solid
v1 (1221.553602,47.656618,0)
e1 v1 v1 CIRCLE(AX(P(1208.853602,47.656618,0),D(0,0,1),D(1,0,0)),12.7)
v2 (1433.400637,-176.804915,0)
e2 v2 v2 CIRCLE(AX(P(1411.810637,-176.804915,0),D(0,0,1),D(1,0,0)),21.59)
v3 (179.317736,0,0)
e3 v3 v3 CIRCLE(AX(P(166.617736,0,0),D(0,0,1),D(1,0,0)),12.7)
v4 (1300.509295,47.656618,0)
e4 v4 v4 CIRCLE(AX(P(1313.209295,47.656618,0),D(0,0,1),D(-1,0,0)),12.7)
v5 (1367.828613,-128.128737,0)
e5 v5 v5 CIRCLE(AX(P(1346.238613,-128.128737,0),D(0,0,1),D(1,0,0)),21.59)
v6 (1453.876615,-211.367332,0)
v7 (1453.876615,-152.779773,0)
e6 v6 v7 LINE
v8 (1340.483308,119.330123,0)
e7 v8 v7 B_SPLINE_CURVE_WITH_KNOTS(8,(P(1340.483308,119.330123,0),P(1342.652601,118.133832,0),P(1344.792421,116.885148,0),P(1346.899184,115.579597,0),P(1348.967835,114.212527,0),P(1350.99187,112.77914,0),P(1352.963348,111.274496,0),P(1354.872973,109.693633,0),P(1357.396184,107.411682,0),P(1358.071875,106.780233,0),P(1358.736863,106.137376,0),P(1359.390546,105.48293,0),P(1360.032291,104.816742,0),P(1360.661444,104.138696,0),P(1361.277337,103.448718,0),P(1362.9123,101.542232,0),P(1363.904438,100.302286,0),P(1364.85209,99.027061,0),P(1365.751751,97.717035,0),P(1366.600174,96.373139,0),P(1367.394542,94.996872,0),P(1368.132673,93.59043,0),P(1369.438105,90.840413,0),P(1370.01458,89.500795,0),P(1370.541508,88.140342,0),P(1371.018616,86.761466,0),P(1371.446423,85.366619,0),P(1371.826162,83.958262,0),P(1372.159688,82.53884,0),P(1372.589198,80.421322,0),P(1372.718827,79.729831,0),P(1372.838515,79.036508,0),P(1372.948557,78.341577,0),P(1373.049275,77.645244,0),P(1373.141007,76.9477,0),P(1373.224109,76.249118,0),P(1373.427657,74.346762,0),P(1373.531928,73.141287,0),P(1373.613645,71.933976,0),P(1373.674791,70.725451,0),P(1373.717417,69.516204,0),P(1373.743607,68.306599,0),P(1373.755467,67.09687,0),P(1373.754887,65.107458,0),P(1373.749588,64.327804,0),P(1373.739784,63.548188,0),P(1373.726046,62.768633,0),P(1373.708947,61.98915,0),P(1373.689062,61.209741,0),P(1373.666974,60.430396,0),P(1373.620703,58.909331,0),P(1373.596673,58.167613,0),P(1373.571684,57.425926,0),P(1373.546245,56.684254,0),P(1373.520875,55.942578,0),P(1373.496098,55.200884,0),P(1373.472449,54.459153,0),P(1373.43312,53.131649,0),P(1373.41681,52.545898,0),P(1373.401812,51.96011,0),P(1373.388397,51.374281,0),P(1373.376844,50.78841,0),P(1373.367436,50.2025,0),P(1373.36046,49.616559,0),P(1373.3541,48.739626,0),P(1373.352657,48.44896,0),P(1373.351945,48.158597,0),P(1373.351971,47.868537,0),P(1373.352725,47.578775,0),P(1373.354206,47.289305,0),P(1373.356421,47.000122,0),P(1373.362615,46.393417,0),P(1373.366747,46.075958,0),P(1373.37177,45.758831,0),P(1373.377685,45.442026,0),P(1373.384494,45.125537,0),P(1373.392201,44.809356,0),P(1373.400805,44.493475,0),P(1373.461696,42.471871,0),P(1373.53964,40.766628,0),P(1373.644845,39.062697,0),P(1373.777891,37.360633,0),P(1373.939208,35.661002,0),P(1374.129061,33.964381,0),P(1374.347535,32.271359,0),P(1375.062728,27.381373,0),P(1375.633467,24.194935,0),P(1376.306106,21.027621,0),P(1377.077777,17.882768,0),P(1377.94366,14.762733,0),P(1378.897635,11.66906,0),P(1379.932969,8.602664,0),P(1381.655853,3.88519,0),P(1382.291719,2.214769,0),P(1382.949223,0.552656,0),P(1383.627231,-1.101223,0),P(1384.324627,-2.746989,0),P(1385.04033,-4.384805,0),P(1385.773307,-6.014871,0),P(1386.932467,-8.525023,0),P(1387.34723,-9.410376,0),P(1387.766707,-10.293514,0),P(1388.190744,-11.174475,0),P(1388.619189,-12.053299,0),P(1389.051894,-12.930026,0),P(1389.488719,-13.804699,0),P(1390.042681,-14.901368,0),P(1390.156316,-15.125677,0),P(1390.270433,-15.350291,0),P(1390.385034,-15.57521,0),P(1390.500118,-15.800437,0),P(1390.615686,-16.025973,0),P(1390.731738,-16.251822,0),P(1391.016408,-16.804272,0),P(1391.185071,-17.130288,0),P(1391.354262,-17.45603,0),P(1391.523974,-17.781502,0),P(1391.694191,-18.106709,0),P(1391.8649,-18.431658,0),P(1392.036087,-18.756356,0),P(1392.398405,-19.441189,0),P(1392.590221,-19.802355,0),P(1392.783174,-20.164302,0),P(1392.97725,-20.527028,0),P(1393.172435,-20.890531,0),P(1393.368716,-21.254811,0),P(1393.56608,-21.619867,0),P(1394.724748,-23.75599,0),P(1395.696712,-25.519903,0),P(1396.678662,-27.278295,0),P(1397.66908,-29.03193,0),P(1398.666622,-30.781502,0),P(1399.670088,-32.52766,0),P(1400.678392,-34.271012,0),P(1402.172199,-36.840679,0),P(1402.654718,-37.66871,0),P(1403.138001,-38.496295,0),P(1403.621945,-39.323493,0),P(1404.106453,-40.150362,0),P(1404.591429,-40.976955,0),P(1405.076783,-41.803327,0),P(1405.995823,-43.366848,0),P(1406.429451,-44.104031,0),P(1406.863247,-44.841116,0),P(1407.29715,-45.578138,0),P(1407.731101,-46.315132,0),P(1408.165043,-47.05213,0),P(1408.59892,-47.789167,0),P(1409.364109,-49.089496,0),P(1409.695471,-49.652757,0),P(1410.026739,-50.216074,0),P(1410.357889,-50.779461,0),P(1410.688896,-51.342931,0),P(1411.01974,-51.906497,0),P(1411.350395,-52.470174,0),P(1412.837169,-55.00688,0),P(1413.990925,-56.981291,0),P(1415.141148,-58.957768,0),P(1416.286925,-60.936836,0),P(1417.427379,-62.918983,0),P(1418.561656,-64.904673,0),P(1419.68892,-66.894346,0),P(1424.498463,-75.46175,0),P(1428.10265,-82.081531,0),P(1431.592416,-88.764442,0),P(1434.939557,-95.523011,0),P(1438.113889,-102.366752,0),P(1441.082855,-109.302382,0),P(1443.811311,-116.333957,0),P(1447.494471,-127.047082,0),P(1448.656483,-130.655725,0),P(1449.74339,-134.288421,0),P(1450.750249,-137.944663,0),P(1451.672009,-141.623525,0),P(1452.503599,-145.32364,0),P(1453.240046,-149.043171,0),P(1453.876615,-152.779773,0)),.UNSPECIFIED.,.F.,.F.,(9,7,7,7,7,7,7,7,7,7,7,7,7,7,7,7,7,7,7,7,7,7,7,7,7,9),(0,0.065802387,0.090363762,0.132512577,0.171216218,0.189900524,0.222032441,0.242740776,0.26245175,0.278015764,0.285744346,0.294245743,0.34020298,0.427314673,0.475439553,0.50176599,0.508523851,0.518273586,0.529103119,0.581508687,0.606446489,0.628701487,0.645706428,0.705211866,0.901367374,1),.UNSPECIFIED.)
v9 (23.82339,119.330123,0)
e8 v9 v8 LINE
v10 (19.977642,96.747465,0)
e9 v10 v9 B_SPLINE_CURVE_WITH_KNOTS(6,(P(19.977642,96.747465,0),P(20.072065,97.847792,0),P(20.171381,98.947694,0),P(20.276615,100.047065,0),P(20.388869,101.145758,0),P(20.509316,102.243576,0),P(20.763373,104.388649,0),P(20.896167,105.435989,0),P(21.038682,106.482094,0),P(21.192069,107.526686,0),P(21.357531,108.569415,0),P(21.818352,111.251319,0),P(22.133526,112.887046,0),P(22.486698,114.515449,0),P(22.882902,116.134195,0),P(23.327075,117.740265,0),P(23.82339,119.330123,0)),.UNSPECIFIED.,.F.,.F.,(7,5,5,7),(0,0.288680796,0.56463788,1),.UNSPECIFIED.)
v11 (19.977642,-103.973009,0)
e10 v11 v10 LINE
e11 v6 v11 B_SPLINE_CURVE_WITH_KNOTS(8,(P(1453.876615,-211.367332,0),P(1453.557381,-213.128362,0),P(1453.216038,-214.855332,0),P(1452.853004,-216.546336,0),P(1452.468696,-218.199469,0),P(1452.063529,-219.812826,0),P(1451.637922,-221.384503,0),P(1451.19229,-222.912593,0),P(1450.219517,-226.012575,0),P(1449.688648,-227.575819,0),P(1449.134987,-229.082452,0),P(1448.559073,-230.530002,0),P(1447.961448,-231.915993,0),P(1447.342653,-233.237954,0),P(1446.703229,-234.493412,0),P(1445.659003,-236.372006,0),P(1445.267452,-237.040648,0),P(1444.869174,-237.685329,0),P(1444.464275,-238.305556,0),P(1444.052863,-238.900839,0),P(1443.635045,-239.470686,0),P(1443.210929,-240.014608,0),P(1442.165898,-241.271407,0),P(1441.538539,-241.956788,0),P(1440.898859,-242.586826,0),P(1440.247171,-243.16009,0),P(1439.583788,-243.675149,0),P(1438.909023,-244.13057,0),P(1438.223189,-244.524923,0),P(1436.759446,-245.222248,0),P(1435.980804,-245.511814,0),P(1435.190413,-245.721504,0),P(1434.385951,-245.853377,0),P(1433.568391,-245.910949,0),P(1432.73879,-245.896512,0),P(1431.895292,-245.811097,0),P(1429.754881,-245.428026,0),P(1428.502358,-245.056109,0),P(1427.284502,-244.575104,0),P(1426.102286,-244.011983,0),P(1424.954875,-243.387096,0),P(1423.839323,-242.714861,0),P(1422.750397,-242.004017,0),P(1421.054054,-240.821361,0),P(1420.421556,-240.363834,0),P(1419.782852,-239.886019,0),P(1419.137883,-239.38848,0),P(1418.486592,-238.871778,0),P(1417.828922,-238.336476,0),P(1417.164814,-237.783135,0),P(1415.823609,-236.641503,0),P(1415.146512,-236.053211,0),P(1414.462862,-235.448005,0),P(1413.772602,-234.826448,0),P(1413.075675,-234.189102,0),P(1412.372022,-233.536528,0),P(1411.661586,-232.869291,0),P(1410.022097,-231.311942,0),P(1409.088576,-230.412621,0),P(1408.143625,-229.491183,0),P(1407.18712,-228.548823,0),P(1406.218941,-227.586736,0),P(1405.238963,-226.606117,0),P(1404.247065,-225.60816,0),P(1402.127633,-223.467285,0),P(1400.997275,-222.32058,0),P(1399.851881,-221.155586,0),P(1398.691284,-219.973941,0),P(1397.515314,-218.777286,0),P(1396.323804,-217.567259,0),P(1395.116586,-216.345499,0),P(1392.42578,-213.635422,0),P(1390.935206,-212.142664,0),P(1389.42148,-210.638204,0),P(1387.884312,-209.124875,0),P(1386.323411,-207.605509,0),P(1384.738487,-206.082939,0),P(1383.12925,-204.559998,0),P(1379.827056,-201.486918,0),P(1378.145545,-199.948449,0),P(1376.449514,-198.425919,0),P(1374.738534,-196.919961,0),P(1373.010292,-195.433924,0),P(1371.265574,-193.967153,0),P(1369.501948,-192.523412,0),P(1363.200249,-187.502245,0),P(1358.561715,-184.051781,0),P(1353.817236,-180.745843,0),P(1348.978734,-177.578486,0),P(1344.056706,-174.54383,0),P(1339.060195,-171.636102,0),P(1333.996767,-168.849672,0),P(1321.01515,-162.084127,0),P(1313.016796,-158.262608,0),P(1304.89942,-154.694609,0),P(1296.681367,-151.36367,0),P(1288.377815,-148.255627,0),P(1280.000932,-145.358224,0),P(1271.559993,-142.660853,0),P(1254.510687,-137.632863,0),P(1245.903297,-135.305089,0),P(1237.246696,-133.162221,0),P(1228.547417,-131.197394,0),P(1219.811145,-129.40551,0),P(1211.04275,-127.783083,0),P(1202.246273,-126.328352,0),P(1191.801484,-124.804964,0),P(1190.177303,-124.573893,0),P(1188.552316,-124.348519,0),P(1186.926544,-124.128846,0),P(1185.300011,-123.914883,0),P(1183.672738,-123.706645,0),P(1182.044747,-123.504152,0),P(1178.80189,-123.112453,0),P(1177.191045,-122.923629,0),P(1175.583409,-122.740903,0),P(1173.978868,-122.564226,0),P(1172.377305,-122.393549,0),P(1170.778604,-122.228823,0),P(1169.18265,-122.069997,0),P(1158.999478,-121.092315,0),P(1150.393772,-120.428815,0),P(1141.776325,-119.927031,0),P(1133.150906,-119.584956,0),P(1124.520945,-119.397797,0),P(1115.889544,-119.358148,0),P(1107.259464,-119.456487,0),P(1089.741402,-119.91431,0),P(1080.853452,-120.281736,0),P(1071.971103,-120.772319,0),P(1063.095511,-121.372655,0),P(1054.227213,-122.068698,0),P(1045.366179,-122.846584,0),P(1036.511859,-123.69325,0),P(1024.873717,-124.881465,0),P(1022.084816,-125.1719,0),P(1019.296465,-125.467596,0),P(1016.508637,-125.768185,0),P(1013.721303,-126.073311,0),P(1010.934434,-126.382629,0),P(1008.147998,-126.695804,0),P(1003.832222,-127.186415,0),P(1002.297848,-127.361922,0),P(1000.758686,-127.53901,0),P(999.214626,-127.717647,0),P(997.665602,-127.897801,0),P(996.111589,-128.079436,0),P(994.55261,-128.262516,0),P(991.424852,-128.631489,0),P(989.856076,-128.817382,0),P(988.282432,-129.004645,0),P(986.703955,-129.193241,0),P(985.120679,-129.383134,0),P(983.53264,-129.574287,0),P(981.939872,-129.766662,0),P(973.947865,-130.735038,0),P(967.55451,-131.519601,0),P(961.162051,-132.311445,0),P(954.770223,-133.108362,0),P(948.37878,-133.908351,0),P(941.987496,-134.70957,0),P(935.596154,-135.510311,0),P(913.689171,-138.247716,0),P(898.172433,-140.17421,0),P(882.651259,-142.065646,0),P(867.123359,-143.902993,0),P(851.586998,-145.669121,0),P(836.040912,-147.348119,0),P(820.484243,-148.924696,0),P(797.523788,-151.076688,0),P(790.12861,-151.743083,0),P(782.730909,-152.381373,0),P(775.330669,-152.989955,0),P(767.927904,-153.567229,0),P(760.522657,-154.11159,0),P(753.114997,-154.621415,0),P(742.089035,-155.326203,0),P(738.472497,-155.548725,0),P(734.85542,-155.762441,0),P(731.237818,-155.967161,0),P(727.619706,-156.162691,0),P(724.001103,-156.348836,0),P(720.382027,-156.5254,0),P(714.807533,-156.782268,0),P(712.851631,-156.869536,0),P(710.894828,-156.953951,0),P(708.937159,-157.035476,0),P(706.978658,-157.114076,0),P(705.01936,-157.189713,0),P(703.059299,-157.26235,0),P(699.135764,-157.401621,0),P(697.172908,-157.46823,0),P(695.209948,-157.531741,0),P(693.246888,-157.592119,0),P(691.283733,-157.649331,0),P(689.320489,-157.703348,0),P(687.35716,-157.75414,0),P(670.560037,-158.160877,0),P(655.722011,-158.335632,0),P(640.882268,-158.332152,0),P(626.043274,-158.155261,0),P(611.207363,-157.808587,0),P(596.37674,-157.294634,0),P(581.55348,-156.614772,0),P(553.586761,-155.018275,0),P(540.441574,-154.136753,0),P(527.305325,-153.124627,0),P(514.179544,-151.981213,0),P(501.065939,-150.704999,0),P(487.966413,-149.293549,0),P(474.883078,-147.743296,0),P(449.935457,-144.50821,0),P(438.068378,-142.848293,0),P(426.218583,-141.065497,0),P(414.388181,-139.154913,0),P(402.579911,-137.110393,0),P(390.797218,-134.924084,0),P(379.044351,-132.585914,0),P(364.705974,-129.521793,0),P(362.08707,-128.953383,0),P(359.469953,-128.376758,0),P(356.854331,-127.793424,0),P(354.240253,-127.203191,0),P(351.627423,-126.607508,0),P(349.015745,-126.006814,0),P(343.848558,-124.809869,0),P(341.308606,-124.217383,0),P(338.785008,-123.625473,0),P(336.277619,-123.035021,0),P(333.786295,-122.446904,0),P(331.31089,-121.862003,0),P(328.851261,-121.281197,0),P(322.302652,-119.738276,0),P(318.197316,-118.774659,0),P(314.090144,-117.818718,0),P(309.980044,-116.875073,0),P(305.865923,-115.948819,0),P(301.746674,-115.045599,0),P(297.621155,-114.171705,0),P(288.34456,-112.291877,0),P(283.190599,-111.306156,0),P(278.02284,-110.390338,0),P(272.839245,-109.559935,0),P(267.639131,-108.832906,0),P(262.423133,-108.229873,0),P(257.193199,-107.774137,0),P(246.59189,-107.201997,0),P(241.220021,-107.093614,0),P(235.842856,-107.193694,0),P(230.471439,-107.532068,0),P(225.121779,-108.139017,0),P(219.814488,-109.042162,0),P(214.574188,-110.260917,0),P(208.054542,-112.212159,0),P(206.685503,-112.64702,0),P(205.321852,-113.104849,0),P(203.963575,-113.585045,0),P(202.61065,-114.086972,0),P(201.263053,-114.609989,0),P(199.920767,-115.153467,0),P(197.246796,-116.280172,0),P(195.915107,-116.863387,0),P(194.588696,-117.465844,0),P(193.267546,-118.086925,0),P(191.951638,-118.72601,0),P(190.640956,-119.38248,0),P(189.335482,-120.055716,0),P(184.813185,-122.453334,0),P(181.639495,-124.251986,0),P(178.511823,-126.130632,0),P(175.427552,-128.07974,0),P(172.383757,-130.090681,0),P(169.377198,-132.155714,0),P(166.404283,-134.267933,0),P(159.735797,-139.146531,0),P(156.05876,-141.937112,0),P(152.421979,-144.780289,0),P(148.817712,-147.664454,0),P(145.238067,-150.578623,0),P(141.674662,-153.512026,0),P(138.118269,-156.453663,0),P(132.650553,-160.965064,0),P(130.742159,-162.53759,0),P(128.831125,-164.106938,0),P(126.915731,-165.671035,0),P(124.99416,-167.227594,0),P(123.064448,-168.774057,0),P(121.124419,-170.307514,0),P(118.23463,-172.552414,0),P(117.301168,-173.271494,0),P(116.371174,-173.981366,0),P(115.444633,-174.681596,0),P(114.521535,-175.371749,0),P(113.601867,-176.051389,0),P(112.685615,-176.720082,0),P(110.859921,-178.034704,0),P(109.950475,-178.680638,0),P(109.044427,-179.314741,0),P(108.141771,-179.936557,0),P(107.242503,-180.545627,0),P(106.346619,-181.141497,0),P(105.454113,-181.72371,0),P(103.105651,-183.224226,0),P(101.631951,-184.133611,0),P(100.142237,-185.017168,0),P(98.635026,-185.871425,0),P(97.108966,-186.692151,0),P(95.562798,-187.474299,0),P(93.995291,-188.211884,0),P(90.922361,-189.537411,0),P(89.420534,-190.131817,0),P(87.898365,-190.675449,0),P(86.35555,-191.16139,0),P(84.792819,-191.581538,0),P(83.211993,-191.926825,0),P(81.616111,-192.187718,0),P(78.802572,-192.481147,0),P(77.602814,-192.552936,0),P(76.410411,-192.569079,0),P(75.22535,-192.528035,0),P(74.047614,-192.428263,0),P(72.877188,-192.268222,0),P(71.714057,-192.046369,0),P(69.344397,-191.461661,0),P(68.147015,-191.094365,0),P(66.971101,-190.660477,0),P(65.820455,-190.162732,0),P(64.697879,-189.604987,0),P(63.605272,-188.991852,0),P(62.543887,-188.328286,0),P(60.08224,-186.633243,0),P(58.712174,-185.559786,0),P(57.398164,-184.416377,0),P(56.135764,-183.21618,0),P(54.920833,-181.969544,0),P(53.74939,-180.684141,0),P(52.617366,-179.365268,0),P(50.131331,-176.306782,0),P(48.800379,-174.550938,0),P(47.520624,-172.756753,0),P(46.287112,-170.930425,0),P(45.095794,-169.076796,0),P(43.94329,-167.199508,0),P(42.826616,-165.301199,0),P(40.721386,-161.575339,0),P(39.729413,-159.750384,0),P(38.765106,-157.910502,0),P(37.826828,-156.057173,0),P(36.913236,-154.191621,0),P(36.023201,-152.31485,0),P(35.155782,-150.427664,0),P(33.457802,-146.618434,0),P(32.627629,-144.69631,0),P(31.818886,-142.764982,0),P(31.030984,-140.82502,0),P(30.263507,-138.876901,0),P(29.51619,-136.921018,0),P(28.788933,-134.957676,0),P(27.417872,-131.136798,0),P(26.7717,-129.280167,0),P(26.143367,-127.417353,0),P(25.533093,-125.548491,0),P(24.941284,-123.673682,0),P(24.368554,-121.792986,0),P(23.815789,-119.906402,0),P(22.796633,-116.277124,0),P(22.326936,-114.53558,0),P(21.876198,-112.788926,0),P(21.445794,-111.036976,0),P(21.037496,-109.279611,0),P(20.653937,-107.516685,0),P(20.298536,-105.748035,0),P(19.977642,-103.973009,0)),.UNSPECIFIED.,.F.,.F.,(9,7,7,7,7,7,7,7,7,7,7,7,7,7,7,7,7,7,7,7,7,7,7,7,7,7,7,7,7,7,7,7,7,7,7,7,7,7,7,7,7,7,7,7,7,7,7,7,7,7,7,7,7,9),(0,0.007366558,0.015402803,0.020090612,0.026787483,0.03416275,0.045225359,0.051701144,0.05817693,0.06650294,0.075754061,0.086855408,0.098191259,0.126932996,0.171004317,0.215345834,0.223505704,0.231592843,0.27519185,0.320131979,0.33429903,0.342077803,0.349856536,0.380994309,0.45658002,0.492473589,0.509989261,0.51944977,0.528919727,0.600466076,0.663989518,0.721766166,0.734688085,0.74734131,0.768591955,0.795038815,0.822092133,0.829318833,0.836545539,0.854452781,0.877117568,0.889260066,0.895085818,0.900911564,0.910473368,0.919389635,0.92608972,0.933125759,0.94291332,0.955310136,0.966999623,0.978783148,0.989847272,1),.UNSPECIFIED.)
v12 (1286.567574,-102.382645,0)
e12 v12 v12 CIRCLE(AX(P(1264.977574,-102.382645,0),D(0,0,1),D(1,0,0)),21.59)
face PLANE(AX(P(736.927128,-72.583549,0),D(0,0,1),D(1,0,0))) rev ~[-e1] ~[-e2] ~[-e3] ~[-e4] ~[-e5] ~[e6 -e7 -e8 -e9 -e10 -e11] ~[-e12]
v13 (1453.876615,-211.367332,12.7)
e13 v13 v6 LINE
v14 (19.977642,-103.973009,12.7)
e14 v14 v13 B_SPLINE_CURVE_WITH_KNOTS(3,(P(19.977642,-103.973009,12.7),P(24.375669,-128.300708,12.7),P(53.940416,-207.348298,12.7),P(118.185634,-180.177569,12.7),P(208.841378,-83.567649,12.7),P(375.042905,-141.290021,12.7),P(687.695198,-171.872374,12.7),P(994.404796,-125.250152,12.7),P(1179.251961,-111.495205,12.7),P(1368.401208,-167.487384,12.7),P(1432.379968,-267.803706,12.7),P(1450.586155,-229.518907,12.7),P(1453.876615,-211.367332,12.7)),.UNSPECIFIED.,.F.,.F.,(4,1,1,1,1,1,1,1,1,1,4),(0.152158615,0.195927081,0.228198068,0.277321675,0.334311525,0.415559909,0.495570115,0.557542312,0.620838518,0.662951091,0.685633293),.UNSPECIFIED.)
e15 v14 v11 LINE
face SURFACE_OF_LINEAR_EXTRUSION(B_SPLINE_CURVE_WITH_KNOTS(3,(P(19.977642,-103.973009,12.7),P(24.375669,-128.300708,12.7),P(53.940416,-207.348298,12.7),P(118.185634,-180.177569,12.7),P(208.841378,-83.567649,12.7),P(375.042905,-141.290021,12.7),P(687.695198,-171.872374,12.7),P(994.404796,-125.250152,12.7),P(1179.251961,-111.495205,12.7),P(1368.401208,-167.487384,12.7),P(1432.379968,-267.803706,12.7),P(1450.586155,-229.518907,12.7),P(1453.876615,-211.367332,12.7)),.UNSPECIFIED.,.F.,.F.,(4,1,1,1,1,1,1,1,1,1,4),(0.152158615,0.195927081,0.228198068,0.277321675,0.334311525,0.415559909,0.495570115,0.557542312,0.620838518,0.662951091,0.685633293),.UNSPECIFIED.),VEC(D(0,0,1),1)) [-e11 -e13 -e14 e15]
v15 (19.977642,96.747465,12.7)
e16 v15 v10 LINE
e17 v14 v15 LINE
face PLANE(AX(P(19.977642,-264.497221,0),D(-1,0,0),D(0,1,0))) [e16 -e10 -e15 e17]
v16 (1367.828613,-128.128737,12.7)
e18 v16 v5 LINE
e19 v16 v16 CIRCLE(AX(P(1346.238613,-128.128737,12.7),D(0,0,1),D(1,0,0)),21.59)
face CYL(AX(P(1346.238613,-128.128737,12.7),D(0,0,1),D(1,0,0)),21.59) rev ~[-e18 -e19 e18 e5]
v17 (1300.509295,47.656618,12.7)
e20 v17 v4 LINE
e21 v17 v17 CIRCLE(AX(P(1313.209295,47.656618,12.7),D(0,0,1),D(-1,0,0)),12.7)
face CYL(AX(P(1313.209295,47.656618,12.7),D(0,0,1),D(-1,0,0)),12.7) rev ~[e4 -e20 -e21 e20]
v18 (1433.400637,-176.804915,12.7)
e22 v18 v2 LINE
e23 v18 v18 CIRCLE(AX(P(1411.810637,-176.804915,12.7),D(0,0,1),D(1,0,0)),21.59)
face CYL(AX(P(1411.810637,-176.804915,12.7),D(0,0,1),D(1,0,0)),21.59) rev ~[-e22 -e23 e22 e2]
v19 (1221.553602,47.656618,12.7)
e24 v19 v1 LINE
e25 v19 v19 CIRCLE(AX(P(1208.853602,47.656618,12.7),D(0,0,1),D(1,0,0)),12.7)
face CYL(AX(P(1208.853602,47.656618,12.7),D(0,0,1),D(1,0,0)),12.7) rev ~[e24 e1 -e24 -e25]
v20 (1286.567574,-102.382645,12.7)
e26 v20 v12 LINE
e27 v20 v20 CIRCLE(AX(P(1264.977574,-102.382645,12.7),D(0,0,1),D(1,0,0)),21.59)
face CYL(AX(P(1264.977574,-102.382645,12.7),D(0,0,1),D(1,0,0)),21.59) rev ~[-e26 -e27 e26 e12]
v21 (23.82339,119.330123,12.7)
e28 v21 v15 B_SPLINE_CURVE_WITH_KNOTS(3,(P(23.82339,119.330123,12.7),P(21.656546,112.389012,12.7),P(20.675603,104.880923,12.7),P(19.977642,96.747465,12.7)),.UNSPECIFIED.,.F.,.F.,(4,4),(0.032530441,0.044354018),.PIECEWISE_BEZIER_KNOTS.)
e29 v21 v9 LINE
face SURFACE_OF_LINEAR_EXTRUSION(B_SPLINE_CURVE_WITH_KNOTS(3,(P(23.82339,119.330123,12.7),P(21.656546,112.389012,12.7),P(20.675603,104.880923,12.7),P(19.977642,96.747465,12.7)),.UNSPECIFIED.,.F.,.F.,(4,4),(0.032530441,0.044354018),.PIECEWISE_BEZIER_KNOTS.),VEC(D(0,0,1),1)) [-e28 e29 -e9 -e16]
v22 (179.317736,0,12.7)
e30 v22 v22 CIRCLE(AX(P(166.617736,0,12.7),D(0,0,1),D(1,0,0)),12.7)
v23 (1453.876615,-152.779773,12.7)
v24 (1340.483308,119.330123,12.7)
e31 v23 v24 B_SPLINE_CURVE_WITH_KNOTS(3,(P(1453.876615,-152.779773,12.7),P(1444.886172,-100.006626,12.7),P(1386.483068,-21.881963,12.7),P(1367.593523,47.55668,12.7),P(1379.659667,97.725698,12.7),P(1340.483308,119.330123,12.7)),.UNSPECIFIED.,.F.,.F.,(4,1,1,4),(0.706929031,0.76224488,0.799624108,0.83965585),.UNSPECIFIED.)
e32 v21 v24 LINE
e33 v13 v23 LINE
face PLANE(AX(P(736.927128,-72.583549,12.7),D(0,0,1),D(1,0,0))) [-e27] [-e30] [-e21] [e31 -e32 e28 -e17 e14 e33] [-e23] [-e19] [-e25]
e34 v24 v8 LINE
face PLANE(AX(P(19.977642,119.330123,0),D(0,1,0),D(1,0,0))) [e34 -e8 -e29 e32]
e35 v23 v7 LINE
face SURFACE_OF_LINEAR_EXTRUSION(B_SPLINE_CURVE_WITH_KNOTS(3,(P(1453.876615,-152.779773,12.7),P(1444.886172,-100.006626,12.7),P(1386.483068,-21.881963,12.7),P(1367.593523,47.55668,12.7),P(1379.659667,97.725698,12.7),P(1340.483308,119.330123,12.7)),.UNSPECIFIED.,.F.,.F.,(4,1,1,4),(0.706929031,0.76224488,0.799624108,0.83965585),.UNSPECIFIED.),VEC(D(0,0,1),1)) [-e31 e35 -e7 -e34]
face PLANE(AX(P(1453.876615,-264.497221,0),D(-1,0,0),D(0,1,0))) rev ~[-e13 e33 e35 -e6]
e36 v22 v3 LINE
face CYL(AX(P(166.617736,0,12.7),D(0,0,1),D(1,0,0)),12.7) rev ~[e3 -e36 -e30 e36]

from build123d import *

# Parameters (mm, degrees)
F0_W     = 1433.8989723474
F0_H     = 383.8273435831
F1_DEPTH = 12.7
F3_DEPTH = 12.701
F4_R     = 12.7
F5_DEPTH = 25.4
F6_R     = 21.59
F7_DEPTH = 12.7010001


with BuildPart() as f1:
    # F0 (on Top) → F1 (new body)
    with BuildSketch(Plane.XY):
        with Locations((736.9271283969, -72.5835487247)):
            Rectangle(F0_W, F0_H)
    extrude(amount=F1_DEPTH)

    # F2 (on face) → F3 (cut, through all)
    with BuildSketch(Plane.XY.offset(12.7)):
        with BuildLine():
            add(Edge.make_bspline(
                [(23.8233897985, 119.3301230669), (21.6565458101, 112.3890118703), (20.6756031882, 104.8809228493), (19.9776422232, 96.7474654317)],
                knots=[0.0325304406, 0.0325304406, 0.0325304406, 0.0325304406, 0.044354018, 0.044354018, 0.044354018, 0.044354018], degree=3))
            Line((23.8233897985, 119.3301230669), (19.9776422232, 119.3301230669))
            Line((19.9776422232, 119.3301230669), (19.9776422232, 96.7474654317))
        make_face()
        with BuildLine():
            Line((1453.8766145706, 119.3301230669), (1340.4833078385, 119.3301230669))
            add(Edge.make_bspline(
                [(1453.8766145706, -152.7797728777), (1444.8861721142, -100.0066257216), (1386.4830680217, -21.8819630361), (1367.5935234806, 47.5566795571), (1379.6596673526, 97.7256977198), (1340.4833078384, 119.3301230669)],
                knots=[0.7069290309, 0.7069290309, 0.7069290309, 0.7069290309, 0.76224488, 0.7996241078, 0.8396558499, 0.8396558499, 0.8396558499, 0.8396558499], degree=3))
            Line((1453.8766145706, -152.7797728777), (1453.8766145706, 119.3301230669))
        make_face()
        with BuildLine():
            add(Edge.make_bspline(
                [(1453.8766145707, -211.3673318743), (1456.9659425303, -194.3252836531), (1457.3377944757, -173.0966101579), (1453.8766145706, -152.7797728777)],
                knots=[0.6856332931, 0.6856332931, 0.6856332931, 0.6856332931, 0.7069290309, 0.7069290309, 0.7069290309, 0.7069290309], degree=3))
            Line((1453.8766145706, -152.7797728777), (1453.8766145706, -211.3673318743))
        make_face()
        with BuildLine():
            Line((1453.8766145706, -264.4972205162), (1453.8766145706, -211.3673318743))
            add(Edge.make_bspline(
                [(19.9776422232, -103.9730086923), (24.3756687382, -128.300707788), (53.9404162103, -207.3482977869), (118.18563376, -180.1775685975), (208.841378416, -83.5676493307), (375.0429052781, -141.2900206769), (687.6951980634, -171.8723737776), (994.404795869, -125.2501516946), (1179.2519608483, -111.4952047309), (1368.4012079058, -167.4873842097), (1432.3799684146, -267.8037059643), (1450.5861550866, -229.5189072101), (1453.8766145707, -211.3673318743)],
                knots=[0.1521586148, 0.1521586148, 0.1521586148, 0.1521586148, 0.1959270808, 0.2281980685, 0.2773216753, 0.3343115246, 0.4155599093, 0.4955701148, 0.5575423121, 0.6208385182, 0.6629510906, 0.6856332931, 0.6856332931, 0.6856332931, 0.6856332931], degree=3))
            Line((19.9776422232, -103.9730086922), (19.9776422232, -264.4972205162))
            Line((19.9776422232, -264.4972205162), (1453.8766145706, -264.4972205162))
        make_face()
    extrude(amount=-F3_DEPTH, mode=Mode.SUBTRACT)

    # F4 (on face) → F5 (cut)
    with BuildSketch(Plane.XY.offset(12.7)):
        with Locations((166.6177362204, 0)):
            Circle(F4_R)
        with BuildLine():
            Line((1221.5536024094, 47.6566180587), (1196.1536024094, 47.6566180587))
            ThreePointArc((1196.1536024094, 47.6566180587), (1208.8536024094, 34.9566180587), (1221.5536024094, 47.6566180587))
        make_face()
        with BuildLine():
            ThreePointArc((1221.5536024094, 47.6566180587), (1208.8536024094, 60.3566180587), (1196.1536024094, 47.6566180587))
            Line((1196.1536024094, 47.6566180587), (1221.5536024094, 47.6566180587))
        make_face()
        with BuildLine():
            ThreePointArc((1325.9092952728, 47.6566180587), (1313.2092952728, 60.3566180587), (1300.5092952728, 47.6566180587))
            ThreePointArc((1300.5092952728, 47.6566180587), (1313.2092952728, 34.9566180587), (1325.9092952728, 47.6566180587))
        make_face()
    extrude(amount=-F5_DEPTH, mode=Mode.SUBTRACT)

    # F6 (on face) → F7 (cut, through all)
    with BuildSketch(Plane.XY.offset(12.7)):
        with Locations((1411.8106365204, -176.8049150705)):
            Circle(F6_R)
        with Locations((1346.2386131287, -128.1287372112)):
            Circle(F6_R)
        with Locations((1264.9775743484, -102.3826450109)):
            Circle(F6_R)
    extrude(amount=-F7_DEPTH, mode=Mode.SUBTRACT)


solid = f1.part
